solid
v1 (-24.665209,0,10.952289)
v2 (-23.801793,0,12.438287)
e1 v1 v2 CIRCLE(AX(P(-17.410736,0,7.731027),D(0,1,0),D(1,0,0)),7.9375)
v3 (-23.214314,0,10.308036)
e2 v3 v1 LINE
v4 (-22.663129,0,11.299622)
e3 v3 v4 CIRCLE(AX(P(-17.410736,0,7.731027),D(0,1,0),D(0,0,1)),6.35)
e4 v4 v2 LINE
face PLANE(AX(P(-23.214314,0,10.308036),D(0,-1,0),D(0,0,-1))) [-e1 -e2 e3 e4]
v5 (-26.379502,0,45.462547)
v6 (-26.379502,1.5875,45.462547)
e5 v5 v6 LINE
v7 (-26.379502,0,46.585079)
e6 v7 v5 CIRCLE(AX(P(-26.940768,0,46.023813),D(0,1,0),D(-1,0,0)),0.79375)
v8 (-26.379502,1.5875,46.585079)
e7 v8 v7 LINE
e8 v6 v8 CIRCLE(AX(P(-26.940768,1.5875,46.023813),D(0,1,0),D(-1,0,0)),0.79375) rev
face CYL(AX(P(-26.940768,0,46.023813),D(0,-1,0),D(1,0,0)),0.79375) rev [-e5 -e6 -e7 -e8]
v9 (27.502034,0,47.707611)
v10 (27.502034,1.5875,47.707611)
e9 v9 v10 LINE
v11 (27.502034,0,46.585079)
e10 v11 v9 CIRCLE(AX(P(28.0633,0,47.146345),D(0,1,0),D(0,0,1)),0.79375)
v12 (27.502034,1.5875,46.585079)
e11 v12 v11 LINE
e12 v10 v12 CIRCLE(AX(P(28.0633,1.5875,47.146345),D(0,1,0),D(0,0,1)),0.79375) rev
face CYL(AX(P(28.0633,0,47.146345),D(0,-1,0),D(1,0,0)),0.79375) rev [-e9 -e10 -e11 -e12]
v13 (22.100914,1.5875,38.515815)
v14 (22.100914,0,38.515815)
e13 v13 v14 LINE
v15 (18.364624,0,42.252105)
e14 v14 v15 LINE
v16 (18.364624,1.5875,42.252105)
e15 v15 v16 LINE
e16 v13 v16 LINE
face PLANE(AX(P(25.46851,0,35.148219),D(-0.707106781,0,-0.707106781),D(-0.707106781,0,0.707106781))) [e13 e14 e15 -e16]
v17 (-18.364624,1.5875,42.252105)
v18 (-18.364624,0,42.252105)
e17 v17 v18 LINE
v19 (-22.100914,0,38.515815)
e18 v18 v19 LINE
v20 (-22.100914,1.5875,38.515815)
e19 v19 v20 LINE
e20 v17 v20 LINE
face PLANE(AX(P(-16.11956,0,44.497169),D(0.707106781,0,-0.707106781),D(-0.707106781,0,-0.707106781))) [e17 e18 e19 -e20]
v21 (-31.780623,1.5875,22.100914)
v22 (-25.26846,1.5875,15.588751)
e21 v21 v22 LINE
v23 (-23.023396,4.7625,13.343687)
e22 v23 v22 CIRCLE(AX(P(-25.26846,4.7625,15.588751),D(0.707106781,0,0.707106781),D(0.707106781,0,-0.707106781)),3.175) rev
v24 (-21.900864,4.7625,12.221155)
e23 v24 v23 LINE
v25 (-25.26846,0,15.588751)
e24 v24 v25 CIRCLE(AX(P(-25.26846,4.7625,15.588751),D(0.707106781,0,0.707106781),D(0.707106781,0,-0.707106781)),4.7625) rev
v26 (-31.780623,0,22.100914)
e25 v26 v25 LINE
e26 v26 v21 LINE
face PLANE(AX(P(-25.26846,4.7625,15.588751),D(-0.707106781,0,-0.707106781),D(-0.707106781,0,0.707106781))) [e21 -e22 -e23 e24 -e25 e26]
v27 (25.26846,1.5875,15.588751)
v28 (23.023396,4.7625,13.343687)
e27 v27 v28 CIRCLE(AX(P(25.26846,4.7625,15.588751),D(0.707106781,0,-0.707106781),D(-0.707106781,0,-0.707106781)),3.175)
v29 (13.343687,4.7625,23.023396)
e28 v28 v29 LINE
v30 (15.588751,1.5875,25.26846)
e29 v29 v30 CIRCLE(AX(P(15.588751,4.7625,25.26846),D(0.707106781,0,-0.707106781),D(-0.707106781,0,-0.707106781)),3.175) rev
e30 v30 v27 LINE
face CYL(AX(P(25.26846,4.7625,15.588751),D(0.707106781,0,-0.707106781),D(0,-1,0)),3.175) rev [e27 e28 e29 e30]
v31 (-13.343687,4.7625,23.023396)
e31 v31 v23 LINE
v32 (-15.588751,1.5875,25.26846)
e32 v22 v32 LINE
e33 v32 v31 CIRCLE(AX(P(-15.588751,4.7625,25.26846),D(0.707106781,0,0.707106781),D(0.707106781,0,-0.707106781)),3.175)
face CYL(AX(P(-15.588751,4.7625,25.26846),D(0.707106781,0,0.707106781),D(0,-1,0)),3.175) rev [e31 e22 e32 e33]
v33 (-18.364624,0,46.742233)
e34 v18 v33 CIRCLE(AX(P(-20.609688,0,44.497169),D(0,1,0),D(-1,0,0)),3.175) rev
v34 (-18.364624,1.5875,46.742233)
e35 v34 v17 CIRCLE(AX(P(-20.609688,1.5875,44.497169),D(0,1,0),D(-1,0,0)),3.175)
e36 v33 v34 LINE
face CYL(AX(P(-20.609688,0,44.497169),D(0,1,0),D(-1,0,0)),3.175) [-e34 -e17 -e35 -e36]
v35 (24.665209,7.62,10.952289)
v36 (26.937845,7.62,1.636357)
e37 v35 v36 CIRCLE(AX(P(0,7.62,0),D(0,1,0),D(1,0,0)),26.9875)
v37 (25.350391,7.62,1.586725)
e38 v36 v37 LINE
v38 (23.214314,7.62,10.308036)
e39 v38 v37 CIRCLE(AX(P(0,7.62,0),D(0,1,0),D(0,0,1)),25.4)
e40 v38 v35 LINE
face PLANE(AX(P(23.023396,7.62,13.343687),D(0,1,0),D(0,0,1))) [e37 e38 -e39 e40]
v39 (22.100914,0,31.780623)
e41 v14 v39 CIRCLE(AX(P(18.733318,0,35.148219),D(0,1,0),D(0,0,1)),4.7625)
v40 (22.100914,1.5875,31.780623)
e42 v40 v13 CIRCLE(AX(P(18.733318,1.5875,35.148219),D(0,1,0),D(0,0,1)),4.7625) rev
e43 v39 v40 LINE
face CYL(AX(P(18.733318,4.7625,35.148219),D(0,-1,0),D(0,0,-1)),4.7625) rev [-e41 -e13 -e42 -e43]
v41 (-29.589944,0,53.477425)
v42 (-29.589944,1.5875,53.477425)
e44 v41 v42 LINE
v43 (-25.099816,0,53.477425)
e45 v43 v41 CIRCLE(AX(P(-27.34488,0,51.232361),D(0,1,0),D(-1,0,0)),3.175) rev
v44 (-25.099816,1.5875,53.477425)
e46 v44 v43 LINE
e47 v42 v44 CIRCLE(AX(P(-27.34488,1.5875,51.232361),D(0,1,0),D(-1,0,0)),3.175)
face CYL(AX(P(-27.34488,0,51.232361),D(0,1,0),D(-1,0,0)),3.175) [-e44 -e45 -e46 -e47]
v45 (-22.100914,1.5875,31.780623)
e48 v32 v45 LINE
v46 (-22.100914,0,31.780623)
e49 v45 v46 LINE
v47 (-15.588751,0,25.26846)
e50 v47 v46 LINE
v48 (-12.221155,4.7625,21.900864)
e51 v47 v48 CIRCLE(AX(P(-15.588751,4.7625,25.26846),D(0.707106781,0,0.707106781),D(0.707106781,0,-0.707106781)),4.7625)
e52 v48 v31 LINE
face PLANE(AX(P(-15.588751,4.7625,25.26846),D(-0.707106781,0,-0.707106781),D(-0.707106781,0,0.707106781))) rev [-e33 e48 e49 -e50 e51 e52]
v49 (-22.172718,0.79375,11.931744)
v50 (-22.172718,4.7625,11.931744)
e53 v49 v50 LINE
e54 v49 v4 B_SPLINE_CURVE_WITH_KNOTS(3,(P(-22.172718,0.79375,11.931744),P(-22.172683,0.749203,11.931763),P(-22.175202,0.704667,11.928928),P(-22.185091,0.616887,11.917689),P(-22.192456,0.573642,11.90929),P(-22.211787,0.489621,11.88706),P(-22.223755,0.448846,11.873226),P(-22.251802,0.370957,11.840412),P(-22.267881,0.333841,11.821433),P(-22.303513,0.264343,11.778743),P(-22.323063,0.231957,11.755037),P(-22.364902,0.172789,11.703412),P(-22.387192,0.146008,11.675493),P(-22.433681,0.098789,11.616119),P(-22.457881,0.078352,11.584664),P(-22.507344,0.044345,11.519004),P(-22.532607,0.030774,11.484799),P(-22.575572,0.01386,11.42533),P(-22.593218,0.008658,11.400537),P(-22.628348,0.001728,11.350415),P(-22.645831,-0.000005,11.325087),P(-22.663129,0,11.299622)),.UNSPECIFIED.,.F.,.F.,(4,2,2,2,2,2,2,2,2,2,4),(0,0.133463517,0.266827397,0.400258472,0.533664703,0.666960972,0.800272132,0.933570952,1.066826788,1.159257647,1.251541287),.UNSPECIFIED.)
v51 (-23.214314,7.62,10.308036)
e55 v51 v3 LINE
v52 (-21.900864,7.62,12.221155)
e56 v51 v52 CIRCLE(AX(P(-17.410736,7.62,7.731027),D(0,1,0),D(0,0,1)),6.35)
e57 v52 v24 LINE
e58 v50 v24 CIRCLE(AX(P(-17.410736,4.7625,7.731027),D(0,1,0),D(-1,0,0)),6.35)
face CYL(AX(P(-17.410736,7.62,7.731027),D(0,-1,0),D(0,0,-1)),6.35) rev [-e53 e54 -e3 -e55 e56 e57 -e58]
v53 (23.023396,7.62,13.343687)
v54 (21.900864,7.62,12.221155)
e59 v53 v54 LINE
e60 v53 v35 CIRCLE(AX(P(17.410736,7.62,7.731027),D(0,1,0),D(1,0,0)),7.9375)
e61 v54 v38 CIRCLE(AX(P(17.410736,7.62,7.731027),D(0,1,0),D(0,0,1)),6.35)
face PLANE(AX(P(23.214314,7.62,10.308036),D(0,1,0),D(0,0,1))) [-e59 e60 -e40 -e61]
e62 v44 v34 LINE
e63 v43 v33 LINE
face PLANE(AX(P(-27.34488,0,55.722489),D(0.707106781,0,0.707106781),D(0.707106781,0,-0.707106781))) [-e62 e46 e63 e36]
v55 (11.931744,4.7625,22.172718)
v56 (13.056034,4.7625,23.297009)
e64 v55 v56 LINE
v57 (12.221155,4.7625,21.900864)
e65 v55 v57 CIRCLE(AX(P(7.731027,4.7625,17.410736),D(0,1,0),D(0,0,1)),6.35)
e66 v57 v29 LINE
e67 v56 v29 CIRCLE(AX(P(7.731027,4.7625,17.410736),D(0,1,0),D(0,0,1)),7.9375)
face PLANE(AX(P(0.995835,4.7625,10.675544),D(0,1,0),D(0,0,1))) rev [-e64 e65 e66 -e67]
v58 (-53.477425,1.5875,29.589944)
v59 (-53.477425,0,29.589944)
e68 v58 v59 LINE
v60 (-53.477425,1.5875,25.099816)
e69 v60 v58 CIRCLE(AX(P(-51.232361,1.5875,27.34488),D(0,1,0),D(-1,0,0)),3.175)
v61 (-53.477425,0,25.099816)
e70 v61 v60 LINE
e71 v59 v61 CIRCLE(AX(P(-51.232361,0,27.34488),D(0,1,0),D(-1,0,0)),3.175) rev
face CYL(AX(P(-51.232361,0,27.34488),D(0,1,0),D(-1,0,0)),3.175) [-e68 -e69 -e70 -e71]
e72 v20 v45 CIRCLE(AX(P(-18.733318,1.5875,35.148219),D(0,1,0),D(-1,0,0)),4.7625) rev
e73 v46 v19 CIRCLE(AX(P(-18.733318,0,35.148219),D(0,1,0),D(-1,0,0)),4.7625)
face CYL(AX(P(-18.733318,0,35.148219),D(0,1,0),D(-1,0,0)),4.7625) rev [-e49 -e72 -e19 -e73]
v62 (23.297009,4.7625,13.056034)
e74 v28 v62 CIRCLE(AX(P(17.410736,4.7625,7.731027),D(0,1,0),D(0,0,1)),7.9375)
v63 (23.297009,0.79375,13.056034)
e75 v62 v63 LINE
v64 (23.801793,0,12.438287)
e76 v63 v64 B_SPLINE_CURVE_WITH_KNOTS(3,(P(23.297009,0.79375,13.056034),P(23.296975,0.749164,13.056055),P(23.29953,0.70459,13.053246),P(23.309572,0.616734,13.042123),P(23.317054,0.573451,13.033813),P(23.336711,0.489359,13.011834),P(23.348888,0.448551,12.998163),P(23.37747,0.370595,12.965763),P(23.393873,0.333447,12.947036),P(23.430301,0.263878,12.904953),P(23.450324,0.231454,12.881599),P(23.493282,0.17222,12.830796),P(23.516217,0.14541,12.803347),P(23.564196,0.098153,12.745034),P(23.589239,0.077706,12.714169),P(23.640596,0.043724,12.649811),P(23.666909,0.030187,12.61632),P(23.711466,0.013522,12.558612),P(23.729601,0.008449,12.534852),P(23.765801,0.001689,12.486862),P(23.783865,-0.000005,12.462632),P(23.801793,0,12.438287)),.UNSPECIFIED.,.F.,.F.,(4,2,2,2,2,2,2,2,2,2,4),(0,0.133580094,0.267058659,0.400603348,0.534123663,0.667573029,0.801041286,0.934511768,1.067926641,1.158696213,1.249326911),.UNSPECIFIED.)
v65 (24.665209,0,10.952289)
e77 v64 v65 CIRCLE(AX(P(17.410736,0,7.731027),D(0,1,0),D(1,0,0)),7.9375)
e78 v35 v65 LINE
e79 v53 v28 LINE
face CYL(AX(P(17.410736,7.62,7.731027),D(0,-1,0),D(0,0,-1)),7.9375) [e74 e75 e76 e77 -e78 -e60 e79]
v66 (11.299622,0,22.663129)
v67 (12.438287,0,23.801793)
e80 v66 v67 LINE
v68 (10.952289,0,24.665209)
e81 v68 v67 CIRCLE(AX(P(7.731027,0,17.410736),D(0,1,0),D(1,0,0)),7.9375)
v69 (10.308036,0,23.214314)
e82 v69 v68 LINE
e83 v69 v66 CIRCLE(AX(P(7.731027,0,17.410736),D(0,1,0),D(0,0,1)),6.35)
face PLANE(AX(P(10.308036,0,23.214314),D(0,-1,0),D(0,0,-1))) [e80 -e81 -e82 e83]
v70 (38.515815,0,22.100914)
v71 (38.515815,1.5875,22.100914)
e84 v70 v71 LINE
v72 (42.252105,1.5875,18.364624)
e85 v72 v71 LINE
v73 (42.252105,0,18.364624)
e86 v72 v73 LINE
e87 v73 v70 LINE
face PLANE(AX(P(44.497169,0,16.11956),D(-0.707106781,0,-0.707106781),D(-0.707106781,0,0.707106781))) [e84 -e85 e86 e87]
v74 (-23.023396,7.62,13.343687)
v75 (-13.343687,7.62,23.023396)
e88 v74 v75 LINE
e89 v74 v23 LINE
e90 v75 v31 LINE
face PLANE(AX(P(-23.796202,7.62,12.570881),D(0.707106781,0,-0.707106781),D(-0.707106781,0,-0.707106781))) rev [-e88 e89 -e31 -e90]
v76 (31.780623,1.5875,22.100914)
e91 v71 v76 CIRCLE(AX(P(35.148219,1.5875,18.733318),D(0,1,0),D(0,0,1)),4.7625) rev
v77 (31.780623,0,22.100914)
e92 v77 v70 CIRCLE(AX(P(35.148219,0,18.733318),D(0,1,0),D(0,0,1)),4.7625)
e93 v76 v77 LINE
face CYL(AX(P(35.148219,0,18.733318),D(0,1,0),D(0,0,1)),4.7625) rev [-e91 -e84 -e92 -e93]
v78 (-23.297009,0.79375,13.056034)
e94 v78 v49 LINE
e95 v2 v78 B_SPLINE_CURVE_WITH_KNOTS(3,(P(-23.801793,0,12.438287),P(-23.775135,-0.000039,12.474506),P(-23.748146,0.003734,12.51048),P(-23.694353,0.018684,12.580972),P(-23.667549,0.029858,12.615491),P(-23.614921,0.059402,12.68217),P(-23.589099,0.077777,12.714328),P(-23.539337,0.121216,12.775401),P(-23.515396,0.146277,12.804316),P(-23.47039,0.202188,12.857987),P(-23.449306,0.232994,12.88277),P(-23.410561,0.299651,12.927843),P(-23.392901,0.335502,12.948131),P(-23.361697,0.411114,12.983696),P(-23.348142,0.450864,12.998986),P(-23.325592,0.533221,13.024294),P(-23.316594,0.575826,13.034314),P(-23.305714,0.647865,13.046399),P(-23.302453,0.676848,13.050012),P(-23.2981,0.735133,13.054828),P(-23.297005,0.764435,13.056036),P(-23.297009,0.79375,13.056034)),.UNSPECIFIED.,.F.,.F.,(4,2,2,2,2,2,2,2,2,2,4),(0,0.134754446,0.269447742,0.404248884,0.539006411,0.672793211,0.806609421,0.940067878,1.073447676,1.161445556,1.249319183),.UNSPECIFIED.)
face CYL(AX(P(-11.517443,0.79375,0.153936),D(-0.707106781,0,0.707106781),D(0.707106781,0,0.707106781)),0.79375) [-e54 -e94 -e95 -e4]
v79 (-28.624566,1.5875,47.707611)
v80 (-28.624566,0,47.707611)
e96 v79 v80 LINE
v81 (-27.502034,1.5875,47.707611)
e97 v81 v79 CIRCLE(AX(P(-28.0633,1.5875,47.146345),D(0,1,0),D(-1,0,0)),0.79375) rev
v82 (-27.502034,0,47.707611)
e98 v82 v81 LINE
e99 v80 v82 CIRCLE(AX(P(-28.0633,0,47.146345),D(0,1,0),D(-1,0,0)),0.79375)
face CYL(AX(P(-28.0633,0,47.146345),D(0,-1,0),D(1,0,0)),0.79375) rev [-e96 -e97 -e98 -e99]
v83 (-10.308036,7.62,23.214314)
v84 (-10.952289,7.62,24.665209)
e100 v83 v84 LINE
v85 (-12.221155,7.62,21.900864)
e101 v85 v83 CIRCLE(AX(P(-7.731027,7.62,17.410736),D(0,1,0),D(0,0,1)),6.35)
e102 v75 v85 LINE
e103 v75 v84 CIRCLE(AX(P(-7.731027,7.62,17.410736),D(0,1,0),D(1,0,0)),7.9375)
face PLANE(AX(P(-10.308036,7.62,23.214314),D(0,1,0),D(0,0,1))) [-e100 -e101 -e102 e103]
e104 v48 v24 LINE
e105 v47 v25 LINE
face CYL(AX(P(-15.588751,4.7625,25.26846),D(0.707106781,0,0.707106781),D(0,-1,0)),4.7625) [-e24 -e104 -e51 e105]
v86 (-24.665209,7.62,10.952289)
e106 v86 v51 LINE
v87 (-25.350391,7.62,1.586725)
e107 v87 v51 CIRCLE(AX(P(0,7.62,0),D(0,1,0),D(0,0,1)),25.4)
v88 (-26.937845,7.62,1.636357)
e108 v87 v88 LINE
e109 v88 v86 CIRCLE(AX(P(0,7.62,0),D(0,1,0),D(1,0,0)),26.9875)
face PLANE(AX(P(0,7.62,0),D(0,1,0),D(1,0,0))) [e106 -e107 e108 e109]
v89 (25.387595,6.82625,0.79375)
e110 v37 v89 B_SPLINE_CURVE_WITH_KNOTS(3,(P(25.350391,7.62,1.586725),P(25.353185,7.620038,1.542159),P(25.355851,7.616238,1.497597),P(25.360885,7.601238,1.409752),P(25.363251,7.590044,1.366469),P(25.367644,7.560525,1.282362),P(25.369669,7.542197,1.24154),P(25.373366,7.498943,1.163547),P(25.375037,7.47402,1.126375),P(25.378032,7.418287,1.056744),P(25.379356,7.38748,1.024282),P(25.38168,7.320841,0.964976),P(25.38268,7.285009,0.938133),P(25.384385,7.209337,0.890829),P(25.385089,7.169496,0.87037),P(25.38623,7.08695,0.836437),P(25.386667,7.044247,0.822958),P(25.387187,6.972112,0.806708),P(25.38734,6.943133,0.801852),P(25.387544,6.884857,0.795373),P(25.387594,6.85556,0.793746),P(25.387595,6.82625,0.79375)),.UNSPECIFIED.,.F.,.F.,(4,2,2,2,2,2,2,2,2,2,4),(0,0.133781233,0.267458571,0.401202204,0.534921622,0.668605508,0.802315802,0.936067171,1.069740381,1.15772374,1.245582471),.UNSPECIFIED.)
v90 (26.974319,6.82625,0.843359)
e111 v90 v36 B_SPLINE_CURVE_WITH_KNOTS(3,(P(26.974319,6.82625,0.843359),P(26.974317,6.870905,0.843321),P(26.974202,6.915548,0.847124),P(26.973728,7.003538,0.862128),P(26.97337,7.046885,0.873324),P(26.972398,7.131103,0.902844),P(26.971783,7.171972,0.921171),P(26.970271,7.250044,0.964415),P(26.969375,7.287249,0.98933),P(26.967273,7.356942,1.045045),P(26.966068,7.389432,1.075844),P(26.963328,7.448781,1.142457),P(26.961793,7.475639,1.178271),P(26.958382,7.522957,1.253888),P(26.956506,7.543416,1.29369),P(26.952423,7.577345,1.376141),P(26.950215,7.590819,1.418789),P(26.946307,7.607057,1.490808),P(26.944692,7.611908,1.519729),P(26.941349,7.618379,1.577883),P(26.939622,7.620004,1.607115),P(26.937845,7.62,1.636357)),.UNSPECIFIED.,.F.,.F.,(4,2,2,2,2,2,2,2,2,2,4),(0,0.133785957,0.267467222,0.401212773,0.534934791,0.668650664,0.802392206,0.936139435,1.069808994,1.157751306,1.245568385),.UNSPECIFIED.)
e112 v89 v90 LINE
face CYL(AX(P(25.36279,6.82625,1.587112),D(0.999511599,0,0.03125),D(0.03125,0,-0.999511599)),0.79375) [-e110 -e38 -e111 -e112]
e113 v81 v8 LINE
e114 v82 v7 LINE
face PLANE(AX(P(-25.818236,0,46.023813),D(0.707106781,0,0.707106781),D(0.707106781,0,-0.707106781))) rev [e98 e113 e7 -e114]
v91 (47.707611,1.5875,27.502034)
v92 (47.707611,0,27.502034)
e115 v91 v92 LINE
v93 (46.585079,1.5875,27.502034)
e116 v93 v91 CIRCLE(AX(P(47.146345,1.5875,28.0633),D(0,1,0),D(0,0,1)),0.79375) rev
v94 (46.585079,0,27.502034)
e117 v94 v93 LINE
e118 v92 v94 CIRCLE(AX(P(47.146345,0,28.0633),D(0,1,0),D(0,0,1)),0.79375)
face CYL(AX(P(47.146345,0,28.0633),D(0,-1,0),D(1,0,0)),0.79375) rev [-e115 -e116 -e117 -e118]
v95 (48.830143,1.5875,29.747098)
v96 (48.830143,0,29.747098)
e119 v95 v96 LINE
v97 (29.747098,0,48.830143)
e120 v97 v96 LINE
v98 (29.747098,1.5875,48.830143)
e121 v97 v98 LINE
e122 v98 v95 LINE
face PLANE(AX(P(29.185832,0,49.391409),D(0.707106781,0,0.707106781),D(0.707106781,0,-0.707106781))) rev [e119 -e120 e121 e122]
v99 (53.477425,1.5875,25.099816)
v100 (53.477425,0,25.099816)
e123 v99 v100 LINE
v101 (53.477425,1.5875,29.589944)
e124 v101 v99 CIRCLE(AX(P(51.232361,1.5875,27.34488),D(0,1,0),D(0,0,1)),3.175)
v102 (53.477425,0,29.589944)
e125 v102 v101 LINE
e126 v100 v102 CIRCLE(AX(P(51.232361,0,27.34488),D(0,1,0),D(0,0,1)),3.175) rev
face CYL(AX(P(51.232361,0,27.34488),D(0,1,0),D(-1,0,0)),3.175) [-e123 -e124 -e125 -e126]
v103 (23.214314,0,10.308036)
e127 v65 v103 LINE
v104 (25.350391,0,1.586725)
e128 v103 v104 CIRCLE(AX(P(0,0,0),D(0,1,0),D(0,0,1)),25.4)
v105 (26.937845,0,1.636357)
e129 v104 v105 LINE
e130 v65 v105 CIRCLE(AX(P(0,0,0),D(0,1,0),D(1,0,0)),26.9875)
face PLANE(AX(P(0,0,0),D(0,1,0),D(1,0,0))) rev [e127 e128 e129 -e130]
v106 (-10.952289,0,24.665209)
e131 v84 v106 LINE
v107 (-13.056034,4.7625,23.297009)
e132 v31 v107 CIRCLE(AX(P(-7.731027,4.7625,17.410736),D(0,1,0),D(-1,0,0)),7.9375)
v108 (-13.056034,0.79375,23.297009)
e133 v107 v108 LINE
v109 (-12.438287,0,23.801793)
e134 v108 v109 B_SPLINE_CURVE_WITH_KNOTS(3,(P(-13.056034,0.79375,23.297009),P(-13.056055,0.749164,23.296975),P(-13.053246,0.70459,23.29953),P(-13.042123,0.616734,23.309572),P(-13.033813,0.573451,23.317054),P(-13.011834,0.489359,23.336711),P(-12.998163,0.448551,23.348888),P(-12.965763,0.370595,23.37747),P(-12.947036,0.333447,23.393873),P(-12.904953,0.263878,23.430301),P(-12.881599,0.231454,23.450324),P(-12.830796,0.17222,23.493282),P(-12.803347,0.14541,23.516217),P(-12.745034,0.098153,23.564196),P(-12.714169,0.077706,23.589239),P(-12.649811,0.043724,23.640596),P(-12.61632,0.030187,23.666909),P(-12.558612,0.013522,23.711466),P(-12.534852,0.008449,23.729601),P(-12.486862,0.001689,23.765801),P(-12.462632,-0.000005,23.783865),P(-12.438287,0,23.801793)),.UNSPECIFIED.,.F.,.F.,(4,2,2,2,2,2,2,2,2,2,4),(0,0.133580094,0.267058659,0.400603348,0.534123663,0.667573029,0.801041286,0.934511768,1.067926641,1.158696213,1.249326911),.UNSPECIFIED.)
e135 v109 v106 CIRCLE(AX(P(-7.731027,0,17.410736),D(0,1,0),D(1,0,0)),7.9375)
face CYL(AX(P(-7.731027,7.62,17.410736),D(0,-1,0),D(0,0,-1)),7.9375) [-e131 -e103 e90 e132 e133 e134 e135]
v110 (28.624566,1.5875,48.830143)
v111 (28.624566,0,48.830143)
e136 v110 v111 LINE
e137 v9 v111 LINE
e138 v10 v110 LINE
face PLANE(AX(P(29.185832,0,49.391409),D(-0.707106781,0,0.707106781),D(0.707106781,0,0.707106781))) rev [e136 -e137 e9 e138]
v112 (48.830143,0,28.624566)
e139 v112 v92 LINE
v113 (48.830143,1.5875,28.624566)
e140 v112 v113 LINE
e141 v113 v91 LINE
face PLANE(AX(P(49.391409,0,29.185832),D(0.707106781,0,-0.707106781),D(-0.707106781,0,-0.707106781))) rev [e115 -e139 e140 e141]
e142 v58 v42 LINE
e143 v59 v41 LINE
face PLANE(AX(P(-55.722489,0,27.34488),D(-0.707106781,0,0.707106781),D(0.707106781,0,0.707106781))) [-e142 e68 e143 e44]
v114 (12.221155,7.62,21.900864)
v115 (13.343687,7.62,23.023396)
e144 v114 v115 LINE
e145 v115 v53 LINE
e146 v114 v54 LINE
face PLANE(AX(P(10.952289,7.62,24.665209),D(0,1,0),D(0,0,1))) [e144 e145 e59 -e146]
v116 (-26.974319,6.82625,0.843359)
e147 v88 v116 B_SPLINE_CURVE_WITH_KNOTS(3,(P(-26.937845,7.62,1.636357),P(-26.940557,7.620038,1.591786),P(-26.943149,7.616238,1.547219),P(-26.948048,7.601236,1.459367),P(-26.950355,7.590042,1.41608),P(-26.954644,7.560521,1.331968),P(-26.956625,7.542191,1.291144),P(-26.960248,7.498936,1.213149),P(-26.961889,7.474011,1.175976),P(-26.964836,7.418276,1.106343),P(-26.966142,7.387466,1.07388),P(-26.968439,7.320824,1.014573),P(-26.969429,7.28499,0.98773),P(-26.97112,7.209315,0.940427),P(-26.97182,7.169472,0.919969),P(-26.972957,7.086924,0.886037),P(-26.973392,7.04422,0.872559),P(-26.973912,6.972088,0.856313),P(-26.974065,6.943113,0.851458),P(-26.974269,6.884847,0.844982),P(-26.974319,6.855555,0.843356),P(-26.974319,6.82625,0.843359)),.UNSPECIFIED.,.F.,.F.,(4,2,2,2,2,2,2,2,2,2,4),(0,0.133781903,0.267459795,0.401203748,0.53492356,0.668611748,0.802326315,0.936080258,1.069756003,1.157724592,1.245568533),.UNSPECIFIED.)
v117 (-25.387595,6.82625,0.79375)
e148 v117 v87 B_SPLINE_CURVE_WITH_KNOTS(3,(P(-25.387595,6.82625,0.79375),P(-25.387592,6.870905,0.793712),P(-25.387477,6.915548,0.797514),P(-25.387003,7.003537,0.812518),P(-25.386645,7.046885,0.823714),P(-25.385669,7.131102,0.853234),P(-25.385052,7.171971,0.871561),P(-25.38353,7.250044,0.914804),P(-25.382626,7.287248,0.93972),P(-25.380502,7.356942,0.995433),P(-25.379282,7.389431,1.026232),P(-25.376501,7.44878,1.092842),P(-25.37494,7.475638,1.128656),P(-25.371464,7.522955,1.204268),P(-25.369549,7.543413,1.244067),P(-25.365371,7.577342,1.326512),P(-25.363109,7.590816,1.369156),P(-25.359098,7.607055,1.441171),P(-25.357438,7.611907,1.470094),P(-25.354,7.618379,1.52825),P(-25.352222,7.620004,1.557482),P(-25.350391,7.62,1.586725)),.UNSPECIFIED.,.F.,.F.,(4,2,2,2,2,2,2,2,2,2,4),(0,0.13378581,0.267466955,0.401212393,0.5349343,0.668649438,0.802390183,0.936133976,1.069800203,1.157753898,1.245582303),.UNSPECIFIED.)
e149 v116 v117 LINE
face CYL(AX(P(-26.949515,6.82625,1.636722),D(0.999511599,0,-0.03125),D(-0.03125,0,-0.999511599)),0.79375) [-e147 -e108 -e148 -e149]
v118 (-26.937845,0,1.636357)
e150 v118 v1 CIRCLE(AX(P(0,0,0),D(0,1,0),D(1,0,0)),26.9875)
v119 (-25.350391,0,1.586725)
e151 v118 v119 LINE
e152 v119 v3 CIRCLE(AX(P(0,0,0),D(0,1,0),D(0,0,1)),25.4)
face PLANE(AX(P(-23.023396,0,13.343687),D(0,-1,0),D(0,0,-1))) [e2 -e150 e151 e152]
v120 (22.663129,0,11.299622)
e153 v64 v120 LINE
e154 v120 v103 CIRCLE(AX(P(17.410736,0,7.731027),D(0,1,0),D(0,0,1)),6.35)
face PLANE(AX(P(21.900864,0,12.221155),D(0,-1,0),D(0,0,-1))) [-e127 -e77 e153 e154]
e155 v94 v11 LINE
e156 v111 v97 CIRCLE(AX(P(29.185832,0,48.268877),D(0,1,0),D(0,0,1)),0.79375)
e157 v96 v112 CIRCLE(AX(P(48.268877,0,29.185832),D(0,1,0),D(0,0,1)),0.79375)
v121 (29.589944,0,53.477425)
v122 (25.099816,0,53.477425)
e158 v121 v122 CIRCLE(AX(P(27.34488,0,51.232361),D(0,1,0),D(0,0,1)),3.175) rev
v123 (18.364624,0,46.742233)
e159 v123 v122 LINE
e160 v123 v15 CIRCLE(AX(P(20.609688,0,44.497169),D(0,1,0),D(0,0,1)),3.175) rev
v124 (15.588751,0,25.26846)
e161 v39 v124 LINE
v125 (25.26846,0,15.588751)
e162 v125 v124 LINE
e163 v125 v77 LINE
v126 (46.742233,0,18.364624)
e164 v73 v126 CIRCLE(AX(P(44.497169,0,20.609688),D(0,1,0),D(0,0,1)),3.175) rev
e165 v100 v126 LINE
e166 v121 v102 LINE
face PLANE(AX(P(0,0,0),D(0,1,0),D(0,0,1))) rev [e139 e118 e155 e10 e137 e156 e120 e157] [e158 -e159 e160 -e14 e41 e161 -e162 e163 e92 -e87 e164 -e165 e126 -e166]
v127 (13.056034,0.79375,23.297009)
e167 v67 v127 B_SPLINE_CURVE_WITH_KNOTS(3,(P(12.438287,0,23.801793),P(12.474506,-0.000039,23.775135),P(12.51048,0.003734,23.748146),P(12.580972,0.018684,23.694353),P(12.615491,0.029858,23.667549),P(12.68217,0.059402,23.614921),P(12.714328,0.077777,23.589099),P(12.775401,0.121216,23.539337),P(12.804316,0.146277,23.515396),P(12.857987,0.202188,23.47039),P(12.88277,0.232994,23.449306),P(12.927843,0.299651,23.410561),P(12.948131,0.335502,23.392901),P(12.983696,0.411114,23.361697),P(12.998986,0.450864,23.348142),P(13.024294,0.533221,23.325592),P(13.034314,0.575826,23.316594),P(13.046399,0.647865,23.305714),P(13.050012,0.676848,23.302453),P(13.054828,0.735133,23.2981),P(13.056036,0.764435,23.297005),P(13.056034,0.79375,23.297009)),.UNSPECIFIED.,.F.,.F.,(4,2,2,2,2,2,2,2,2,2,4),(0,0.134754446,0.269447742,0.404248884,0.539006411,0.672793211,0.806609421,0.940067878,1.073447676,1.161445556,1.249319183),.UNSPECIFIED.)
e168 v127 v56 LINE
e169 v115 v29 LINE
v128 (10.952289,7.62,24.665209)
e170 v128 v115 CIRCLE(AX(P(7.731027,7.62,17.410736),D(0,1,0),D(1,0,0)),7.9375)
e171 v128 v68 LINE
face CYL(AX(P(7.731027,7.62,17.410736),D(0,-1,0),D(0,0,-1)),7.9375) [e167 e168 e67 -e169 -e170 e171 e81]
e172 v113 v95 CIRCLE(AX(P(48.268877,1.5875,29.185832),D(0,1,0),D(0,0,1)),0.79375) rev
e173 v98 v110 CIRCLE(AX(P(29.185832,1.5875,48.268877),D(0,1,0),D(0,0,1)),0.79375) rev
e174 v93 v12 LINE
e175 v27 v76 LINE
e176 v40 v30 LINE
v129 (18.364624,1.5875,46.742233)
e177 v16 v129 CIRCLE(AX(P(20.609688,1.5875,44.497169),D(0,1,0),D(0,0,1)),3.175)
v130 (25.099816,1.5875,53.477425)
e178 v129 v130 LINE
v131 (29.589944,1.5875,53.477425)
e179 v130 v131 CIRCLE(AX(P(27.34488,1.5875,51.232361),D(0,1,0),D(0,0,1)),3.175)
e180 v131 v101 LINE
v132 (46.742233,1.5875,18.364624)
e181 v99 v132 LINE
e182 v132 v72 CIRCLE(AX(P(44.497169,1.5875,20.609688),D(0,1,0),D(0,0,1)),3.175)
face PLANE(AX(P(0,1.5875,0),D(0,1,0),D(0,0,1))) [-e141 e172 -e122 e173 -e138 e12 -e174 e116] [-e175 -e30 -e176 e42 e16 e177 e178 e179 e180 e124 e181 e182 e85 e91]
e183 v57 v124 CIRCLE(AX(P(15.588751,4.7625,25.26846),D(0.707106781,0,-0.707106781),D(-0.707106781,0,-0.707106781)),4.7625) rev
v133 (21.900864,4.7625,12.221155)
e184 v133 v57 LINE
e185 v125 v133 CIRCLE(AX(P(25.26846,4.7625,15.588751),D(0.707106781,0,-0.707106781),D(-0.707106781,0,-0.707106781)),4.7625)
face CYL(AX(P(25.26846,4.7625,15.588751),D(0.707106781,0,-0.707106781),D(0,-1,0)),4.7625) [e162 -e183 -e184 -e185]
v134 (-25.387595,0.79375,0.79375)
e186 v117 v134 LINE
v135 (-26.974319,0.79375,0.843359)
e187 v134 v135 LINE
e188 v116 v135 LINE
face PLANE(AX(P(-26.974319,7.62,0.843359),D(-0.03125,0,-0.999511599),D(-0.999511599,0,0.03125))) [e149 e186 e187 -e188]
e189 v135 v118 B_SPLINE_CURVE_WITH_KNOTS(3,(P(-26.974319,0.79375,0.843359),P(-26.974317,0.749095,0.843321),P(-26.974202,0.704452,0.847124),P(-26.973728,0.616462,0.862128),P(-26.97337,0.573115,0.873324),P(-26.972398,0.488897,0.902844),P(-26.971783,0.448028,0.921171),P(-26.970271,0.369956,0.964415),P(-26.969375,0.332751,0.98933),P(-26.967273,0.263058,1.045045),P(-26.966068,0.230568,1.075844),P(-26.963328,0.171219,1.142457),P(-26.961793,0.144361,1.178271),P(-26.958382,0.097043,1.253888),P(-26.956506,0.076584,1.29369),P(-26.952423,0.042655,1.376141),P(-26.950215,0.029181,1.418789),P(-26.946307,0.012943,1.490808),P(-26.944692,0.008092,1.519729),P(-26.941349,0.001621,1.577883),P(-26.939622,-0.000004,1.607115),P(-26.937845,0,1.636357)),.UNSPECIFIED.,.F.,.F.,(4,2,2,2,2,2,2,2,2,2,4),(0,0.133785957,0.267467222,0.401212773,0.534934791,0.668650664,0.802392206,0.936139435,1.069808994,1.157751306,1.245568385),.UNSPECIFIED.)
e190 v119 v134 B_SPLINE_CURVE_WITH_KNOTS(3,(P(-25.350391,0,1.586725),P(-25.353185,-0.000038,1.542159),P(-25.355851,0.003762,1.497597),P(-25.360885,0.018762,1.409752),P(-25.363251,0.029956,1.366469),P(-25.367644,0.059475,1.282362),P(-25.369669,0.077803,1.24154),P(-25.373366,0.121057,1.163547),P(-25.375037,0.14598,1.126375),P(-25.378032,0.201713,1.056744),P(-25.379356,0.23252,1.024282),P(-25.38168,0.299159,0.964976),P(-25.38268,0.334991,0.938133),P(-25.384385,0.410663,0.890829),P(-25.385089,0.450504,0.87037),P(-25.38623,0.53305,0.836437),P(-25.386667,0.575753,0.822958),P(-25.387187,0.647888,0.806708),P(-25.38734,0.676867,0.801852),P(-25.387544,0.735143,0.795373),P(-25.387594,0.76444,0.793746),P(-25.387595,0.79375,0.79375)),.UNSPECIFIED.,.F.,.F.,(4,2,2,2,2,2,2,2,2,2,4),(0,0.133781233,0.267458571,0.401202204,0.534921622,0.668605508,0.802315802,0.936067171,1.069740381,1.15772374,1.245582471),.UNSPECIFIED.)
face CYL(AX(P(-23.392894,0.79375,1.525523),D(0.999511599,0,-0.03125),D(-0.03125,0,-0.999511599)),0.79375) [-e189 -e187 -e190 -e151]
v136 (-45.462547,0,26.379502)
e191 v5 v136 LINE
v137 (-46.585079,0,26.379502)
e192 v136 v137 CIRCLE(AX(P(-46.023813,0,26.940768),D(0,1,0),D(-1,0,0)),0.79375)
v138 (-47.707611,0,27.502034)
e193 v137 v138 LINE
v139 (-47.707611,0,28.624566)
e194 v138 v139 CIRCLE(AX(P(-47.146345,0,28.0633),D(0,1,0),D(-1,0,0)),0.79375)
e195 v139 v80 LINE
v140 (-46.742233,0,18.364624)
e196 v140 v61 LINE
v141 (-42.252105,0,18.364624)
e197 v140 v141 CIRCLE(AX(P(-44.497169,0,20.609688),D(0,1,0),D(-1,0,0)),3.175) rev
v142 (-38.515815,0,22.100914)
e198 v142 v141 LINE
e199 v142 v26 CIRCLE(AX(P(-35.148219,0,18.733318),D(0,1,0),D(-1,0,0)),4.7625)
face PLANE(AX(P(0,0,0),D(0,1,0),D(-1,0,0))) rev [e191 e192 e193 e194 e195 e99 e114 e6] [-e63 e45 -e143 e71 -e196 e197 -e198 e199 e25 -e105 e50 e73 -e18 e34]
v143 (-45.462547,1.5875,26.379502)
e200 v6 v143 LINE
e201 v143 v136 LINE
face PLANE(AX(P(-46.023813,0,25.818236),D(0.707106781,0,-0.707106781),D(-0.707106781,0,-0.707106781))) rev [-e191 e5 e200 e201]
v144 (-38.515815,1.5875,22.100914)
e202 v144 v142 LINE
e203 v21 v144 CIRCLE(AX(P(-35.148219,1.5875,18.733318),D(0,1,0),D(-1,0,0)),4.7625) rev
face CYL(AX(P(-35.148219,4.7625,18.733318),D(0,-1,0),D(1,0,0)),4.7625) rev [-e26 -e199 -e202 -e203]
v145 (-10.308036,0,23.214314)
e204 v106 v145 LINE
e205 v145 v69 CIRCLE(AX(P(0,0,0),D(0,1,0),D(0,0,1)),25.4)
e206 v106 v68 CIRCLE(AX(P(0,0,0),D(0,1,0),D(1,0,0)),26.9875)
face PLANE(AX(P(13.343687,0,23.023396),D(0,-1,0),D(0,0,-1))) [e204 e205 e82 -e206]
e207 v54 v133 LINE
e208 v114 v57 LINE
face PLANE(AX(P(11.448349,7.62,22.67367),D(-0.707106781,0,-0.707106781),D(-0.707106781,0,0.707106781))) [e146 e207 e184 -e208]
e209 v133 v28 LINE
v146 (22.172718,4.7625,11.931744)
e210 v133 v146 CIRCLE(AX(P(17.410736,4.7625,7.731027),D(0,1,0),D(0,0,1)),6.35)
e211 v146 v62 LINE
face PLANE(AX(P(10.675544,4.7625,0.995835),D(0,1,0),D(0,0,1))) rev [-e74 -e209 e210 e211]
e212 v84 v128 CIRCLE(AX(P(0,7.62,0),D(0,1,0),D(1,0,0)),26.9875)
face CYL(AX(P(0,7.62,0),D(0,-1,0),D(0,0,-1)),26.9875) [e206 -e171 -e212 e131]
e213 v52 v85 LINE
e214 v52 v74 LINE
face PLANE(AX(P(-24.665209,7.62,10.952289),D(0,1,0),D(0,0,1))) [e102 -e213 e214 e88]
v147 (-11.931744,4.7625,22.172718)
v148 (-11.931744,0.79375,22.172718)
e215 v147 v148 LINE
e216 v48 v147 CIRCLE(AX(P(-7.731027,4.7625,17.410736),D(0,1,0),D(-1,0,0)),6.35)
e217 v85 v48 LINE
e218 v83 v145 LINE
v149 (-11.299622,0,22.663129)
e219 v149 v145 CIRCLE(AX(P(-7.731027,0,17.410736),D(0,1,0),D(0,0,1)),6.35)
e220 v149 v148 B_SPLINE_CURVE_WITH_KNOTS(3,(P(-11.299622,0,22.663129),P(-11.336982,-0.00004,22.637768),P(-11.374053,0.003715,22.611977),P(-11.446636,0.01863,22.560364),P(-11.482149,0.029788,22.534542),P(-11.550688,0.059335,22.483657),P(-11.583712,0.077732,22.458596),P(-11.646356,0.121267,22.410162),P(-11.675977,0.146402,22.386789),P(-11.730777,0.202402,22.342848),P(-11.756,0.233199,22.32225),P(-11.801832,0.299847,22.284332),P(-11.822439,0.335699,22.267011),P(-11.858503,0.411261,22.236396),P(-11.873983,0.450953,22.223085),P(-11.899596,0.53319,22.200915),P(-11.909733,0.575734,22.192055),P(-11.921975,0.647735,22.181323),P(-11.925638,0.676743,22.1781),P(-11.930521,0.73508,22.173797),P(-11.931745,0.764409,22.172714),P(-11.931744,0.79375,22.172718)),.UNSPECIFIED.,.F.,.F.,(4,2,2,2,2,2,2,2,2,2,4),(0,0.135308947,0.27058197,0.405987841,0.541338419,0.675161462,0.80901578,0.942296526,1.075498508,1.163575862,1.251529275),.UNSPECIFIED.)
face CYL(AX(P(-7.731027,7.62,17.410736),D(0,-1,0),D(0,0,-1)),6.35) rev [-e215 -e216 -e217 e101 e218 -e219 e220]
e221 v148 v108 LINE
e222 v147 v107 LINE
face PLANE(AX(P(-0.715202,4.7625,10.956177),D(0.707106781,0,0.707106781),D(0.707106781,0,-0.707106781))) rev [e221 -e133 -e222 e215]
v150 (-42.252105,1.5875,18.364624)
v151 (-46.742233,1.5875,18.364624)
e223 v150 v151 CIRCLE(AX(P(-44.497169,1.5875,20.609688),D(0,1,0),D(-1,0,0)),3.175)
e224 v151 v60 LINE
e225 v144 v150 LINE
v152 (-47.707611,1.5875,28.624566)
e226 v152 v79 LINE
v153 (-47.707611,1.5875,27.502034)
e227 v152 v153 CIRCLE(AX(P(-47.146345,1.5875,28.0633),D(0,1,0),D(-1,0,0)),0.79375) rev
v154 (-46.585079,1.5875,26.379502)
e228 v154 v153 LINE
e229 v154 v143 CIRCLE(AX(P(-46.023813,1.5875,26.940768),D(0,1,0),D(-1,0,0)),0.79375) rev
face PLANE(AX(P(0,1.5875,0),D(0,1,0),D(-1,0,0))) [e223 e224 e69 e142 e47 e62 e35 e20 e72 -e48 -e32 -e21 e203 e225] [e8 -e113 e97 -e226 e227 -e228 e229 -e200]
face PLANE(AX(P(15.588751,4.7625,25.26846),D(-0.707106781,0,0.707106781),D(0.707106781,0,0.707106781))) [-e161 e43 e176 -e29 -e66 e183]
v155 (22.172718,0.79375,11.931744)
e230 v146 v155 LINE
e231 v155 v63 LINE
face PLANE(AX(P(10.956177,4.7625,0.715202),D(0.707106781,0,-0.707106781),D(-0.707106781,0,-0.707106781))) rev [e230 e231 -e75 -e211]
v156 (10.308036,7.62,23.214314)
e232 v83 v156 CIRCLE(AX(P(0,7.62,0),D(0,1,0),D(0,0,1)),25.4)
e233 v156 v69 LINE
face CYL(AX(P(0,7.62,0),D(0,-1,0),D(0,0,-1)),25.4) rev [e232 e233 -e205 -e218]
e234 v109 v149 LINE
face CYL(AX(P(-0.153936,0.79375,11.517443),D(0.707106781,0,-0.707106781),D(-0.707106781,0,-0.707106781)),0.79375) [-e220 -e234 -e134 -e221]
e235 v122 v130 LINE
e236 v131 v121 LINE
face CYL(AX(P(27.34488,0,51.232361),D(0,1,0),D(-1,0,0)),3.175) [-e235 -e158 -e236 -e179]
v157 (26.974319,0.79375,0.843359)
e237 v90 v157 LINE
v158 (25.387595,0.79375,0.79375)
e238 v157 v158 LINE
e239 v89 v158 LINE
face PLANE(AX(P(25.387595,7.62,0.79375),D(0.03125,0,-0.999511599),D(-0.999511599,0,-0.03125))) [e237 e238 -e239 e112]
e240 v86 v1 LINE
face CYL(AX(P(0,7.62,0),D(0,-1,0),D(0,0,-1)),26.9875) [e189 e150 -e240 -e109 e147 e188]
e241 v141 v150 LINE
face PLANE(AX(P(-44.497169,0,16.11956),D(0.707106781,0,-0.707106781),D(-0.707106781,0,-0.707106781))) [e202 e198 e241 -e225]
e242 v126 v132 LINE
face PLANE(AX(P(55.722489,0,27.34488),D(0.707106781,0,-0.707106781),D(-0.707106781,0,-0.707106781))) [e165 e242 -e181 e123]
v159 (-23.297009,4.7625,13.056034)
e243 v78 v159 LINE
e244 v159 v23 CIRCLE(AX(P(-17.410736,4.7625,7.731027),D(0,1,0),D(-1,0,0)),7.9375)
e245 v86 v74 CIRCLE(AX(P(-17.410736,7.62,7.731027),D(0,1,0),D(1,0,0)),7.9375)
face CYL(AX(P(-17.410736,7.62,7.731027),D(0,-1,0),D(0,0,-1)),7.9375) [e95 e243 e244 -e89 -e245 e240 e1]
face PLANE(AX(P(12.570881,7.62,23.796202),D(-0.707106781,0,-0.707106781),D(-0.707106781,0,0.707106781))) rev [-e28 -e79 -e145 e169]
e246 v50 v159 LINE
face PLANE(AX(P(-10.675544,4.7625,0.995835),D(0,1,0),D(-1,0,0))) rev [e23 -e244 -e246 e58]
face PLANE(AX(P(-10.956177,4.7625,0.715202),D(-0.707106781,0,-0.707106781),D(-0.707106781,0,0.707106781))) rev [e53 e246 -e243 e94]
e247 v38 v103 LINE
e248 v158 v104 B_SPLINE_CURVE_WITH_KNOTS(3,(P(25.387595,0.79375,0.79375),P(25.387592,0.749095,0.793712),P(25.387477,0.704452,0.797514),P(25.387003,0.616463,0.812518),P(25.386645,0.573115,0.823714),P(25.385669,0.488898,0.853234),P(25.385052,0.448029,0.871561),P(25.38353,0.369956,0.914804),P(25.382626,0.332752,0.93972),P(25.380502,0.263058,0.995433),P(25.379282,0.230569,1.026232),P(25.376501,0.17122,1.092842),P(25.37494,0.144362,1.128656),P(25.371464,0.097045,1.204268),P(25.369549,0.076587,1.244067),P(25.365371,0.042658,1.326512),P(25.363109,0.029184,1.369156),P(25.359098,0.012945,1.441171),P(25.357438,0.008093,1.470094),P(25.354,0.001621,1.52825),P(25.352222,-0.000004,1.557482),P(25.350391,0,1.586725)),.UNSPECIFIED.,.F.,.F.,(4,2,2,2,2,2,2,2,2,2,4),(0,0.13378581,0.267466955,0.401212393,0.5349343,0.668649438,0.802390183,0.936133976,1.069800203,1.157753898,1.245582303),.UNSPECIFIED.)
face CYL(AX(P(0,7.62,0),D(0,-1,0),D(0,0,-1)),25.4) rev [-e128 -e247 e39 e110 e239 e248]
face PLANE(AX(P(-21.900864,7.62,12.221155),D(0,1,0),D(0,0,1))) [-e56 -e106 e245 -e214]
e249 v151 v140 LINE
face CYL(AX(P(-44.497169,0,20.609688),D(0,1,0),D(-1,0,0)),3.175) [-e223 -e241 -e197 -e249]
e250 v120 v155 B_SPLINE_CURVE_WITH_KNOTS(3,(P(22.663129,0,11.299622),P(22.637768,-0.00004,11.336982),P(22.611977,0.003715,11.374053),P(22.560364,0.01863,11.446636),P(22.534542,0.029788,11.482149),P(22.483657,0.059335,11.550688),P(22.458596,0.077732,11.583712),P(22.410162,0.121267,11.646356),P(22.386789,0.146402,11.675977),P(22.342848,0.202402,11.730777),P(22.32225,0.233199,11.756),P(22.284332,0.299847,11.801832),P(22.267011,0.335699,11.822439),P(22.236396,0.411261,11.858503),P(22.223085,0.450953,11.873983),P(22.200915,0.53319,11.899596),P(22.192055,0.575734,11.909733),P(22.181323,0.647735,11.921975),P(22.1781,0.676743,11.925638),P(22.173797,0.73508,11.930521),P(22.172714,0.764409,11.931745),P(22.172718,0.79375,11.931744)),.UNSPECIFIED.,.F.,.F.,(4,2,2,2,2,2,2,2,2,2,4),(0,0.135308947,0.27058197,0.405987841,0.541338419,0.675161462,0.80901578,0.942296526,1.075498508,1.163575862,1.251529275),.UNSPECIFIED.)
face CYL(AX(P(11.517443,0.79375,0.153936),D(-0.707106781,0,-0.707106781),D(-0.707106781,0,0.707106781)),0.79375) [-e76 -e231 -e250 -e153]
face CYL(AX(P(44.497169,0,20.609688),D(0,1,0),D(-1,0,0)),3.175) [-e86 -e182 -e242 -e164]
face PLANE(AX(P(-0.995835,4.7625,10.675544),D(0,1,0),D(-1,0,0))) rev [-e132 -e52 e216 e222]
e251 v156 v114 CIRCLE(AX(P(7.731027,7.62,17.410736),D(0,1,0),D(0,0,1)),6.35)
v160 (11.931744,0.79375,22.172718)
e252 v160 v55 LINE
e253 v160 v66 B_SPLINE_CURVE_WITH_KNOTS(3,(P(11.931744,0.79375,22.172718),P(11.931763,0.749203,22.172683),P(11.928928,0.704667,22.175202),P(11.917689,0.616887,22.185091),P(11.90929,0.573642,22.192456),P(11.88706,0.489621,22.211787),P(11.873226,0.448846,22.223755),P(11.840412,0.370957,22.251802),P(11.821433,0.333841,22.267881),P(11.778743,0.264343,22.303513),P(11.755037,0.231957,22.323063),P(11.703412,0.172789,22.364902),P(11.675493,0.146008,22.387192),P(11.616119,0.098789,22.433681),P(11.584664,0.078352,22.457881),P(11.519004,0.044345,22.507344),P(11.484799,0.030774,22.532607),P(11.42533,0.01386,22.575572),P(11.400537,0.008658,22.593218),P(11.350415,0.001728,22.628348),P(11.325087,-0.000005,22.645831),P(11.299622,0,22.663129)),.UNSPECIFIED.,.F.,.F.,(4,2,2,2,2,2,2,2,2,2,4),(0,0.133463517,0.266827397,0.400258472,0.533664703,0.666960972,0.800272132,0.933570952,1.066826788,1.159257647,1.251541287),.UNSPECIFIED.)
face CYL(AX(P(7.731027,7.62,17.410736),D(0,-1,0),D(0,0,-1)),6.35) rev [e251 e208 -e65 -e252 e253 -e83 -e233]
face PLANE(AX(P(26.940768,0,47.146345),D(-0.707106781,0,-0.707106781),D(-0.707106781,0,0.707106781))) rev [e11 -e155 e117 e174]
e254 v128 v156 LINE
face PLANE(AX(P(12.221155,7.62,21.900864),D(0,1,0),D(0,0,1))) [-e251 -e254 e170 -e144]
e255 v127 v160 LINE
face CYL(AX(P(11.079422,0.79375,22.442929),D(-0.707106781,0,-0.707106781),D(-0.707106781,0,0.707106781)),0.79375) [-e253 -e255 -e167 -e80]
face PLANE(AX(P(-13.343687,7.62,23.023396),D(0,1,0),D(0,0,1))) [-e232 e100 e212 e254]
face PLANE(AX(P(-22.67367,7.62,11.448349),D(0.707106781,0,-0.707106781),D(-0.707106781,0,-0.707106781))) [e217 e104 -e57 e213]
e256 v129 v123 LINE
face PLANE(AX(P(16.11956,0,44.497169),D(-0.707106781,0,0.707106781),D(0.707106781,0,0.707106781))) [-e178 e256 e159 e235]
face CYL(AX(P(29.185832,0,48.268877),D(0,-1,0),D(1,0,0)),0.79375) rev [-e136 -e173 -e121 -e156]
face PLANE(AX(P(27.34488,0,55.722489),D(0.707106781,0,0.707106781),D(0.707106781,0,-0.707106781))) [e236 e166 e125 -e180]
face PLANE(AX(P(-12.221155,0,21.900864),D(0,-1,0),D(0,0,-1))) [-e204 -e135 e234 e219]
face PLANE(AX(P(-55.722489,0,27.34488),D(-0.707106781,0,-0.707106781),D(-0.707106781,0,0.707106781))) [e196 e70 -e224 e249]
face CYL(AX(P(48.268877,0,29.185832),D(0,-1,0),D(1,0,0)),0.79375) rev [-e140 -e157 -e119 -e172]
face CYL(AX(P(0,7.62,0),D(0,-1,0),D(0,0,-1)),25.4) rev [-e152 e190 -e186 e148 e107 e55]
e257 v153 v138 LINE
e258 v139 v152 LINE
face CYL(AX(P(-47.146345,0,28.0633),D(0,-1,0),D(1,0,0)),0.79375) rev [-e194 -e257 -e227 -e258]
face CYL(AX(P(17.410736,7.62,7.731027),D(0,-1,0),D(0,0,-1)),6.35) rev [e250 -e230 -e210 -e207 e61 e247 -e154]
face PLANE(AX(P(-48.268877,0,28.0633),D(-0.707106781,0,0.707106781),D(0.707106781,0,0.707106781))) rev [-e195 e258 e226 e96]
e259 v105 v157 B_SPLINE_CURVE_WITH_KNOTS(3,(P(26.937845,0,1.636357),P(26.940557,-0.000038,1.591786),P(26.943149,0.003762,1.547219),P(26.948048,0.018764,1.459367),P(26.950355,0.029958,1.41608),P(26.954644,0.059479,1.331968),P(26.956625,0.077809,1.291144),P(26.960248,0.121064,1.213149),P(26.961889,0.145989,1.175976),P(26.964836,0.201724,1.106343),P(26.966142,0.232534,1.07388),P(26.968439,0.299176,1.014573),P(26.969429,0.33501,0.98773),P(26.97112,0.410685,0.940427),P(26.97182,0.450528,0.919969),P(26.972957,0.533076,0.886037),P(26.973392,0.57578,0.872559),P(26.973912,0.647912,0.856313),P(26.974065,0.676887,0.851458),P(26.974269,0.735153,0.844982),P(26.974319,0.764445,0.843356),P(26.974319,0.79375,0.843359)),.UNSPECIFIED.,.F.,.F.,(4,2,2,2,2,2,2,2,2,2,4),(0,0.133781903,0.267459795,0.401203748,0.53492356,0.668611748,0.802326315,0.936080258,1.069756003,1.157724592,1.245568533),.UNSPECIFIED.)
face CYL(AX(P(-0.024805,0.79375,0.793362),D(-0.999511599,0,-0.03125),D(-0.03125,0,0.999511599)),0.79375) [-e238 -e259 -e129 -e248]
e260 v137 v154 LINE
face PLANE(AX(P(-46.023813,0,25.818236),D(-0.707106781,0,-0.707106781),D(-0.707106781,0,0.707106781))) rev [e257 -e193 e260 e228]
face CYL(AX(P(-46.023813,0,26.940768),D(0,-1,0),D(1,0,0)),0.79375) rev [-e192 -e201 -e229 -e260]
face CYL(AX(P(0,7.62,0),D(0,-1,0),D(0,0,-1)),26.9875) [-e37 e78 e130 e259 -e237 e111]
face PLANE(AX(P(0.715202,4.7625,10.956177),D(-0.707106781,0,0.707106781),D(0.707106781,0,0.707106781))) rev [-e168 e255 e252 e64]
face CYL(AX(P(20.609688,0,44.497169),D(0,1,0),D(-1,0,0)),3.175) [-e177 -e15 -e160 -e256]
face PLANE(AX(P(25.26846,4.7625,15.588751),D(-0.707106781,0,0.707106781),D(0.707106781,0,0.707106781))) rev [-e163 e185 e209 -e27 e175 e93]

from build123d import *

# Parameters (mm, degrees)
BASE_FLANGE1_DEPTH             = 7.62
EDGE_FLANGE1_STRIP_W           = 12.7
EDGE_FLANGE1_STRIP_H           = 1.5875
EDGE_FLANGE1_STRIP_CUT_DEPTH   = 13.689174868
EDGE_FLANGE1_STRIP_2_W         = 12.7
EDGE_FLANGE1_STRIP_2_H         = 1.5875
EDGE_FLANGE1_STRIP_CUT_2_DEPTH = 13.689174868
EDGE_FLANGE1_DEPTH             = 13.689174868
EDGE_FLANGE1_BEND_DEPTH        = 13.689174868
SKETCH12_W                     = 0.396875
SKETCH12_H                     = 4.784490506
SKETCH12_H_2                   = 4.782978668
CUT_EXTRUDE3_DEPTH             = 25.4
SKETCH13_W                     = 0.396875
SKETCH13_H                     = 4.7625
CUT_EXTRUDE4_DEPTH             = 25.4
FILLET2_R                      = 0.79375
BOSS_EXTRUDE1_DEPTH            = 1.5875
FILLET3_R                      = 3.175
FILLET4_R                      = 4.7625
FILLET5_R                      = 0.79375


# Read off the part's stored shape, not the designer's step: Base-Flange1
# Sheet-metal steps are written as plain solids
with BuildPart() as part:
    # Base-Flange1 outline → Base-Flange1 (new body)
    with BuildSketch(Plane(origin=(0, 0, 0), x_dir=(1, 0, 0), z_dir=(0, 1, 0))):
        with BuildLine():
            ThreePointArc((24.665208878, -10.952288676), (26.30984284, -6.00976921), (26.974319291, -0.843359375))
            Line((26.974319291, -0.843359375), (25.387594627, -0.79375))
            ThreePointArc((25.387594627, -0.79375), (24.762205026, -5.656253374), (23.214314238, -10.308036401))
            ThreePointArc((23.214314238, -10.308036401), (22.645724221, -11.325105064), (21.900863739, -12.221155361))
            Line((21.900863739, -12.221155361), (12.221155361, -21.900863739))
            ThreePointArc((12.221155361, -21.900863739), (11.325105064, -22.645724221), (10.308036401, -23.214314238))
            ThreePointArc((10.308036401, -23.214314238), (0, -25.4), (-10.308036401, -23.214314238))
            ThreePointArc((-10.308036401, -23.214314238), (-11.325105064, -22.645724221), (-12.221155361, -21.900863739))
            Line((-12.221155361, -21.900863739), (-21.900863739, -12.221155361))
            ThreePointArc((-21.900863739, -12.221155361), (-22.645724221, -11.325105064), (-23.214314238, -10.308036401))
            ThreePointArc((-23.214314238, -10.308036401), (-24.762205026, -5.656253374), (-25.387594627, -0.79375))
            Line((-25.387594627, -0.79375), (-26.974319291, -0.843359375))
            ThreePointArc((-26.974319291, -0.843359375), (-26.30984284, -6.00976921), (-24.665208878, -10.952288676))
            ThreePointArc((-24.665208878, -10.952288676), (-23.954471356, -12.223624504), (-23.023395754, -13.343687376))
            Line((-23.023395754, -13.343687376), (-13.343687376, -23.023395754))
            ThreePointArc((-13.343687376, -23.023395754), (-12.223624504, -23.954471356), (-10.952288676, -24.665208878))
            ThreePointArc((-10.952288676, -24.665208878), (0, -26.9875), (10.952288676, -24.665208878))
            ThreePointArc((10.952288676, -24.665208878), (12.223624504, -23.954471356), (13.343687376, -23.023395754))
            Line((13.343687376, -23.023395754), (23.023395754, -13.343687376))
            ThreePointArc((23.023395754, -13.343687376), (23.954471356, -12.223624504), (24.665208878, -10.952288676))
        make_face()
    extrude(amount=BASE_FLANGE1_DEPTH)

    # Edge-Flange1 strip (across the edge) → Edge-Flange1 strip cut (cut)
    with BuildSketch(Plane(origin=(-23.023395754, 0, 13.343687376), x_dir=(0, 1, 0), z_dir=(0.7071067811865437, 0, 0.7071067811865515))):
        with Locations((-1.5875, -0.79375)):
            Rectangle(EDGE_FLANGE1_STRIP_W, EDGE_FLANGE1_STRIP_H)
    extrude(amount=EDGE_FLANGE1_STRIP_CUT_DEPTH, mode=Mode.SUBTRACT)

    # Edge-Flange1 strip 2 (across the edge) → Edge-Flange1 strip cut 2 (cut)
    with BuildSketch(Plane(origin=(13.343687376, 0, 23.023395754), x_dir=(0, 1, 0), z_dir=(0.7071067811865512, 0, -0.7071067811865438))):
        with Locations((-1.5875, -0.79375)):
            Rectangle(EDGE_FLANGE1_STRIP_2_W, EDGE_FLANGE1_STRIP_2_H)
    extrude(amount=EDGE_FLANGE1_STRIP_CUT_2_DEPTH, mode=Mode.SUBTRACT)

    # Edge-Flange1 section (across the edge) → Edge-Flange1 (add)
    with BuildSketch(Plane(origin=(-23.023395754, 0, 13.343687376), x_dir=(0, 1, 0), z_dir=(0.7071067811865437, 0, 0.7071067811865515))):
        with BuildLine():
            Line((0, 3.175), (0, 7.9375))
            Line((0, 7.9375), (1.5875, 7.9375))
            Line((1.5875, 7.9375), (1.5875, 3.175))
            ThreePointArc((1.5875, 3.175), (2.51743597, 0.92993597), (4.7625, 0))
            Line((4.7625, 0), (4.7625, -1.5875))
            ThreePointArc((4.7625, -1.5875), (1.394903955, -0.192596045), (0, 3.175))
        make_face()
    extrude(amount=EDGE_FLANGE1_DEPTH)

    # Edge-Flange1 section 2 (across the edge) → Edge-Flange1 bend (add)
    with BuildSketch(Plane(origin=(13.343687376, 0, 23.023395754), x_dir=(0, 1, 0), z_dir=(0.7071067811865512, 0, -0.7071067811865438))):
        with BuildLine():
            Line((0, 3.175), (0, 7.9375))
            Line((0, 7.9375), (1.5875, 7.9375))
            Line((1.5875, 7.9375), (1.5875, 3.175))
            ThreePointArc((1.5875, 3.175), (2.51743597, 0.92993597), (4.7625, 0))
            Line((4.7625, 0), (4.7625, -1.5875))
            ThreePointArc((4.7625, -1.5875), (1.394903955, -0.192596045), (0, 3.175))
        make_face()
    extrude(amount=EDGE_FLANGE1_BEND_DEPTH)

    # Sketch12 → Cut-Extrude3 (cut)
    with BuildSketch(Plane(origin=(-23.796201641, 0, 23.796201641), x_dir=(0.7071067811865438, 3.532708032038459e-15, 0.7071067811865512), z_dir=(-0.7071067811865512, -3.532708032038497e-15, 0.7071067811865438))):
        with Locations((7.043024934, 2.370254747)):
            Rectangle(SKETCH12_W, SKETCH12_H)
        with Locations((-7.043024934, 2.371010666)):
            Rectangle(SKETCH12_W, SKETCH12_H_2)
    extrude(amount=-CUT_EXTRUDE3_DEPTH, mode=Mode.SUBTRACT)

    # Sketch13 → Cut-Extrude4 (cut)
    with BuildSketch(Plane(origin=(23.796201641, 0, 23.796201641), x_dir=(0.7071067811865513, 3.414951097637176e-15, -0.7071067811865437), z_dir=(0.7071067811865437, -3.414951097637212e-15, 0.7071067811865513))):
        with Locations((7.043024934, 2.38125)):
            Rectangle(SKETCH13_W, SKETCH13_H)
        with Locations((-7.043024934, 2.38125)):
            Rectangle(SKETCH13_W, SKETCH13_H)
    extrude(amount=-CUT_EXTRUDE4_DEPTH, mode=Mode.SUBTRACT)

    # Fillet2
    fillet2_edges = [part.edges().sort_by_distance(p)[0] for p in [
        (-12.493889076, 0, 22.734863462),
        (-22.734863462, 0, 12.493889076),
        (-26.180956959, 0, 0.818554688),
        (22.734863462, 0, 12.493889076),
        (26.180956959, 0, 0.818554688),
        (12.493889076, 0, 22.734863462),
        (-26.180956959, 7.62, 0.818554688),
        (26.180956959, 7.62, 0.818554688),
    ]]
    fillet(fillet2_edges, radius=FILLET2_R)

    # Sketch4 → Boss-Extrude1 (add)
    # profile 1 of 2: a face of its own
    with BuildSketch(Plane(origin=(0, 1.5875, 0), x_dir=(1, 0, 0), z_dir=(0, 1, 0))):
        Polygon((-18.956347452, -28.63605583), (-25.46851022, -35.148218598), (-16.119559737, -44.49716908), (-27.344879889, -55.722489231), (-55.722489231, -27.344879889), (-44.49716908, -16.119559737), (-35.148218598, -25.46851022), (-28.63605583, -18.956347452), align=None)
        Polygon((-48.268876651, -28.063300378), (-28.063300378, -48.268876651), (-25.818236348, -46.02381262), (-46.02381262, -25.818236348), align=None, mode=Mode.SUBTRACT)
    # profile 2 of 2: a face of its own
    with BuildSketch(Plane(origin=(0, 1.5875, 0), x_dir=(1, 0, 0), z_dir=(0, 1, 0))):
        Polygon((18.956347452, -28.63605583), (25.46851022, -35.148218598), (16.119559737, -44.49716908), (27.344879889, -55.722489231), (55.722489231, -27.344879889), (44.49716908, -16.119559737), (35.148218598, -25.46851022), (28.63605583, -18.956347452), align=None)
        Polygon((29.185832393, -49.391408666), (26.940768363, -47.146344636), (47.146344636, -26.940768363), (49.391408666, -29.185832393), align=None, mode=Mode.SUBTRACT)
    extrude(amount=-BOSS_EXTRUDE1_DEPTH)

    # Fillet3
    fillet3_edges = [part.edges().sort_by_distance(p)[0] for p in [
        (-16.119559737, 0.79375, 44.49716908),
        (-27.344879889, 0.79375, 55.722489231),
        (-55.722489231, 0.79375, 27.344879889),
        (-44.49716908, 0.79375, 16.119559737),
        (44.49716908, 0.79375, 16.119559737),
        (55.722489231, 0.79375, 27.344879889),
        (27.344879889, 0.79375, 55.722489231),
        (16.119559737, 0.79375, 44.49716908),
    ]]
    fillet(fillet3_edges, radius=FILLET3_R)

    # Fillet4
    fillet4_edges = [part.edges().sort_by_distance(p)[0] for p in [
        (-25.46851022, 0.79375, 35.148218598),
        (-35.148218598, 0.79375, 25.46851022),
        (35.148218598, 0.79375, 25.46851022),
        (25.46851022, 0.79375, 35.148218598),
    ]]
    fillet(fillet4_edges, radius=FILLET4_R)

    # Fillet5
    fillet5_edges = [part.edges().sort_by_distance(p)[0] for p in [
        (-46.02381262, 0.79375, 25.818236348),
        (-25.818236348, 0.79375, 46.02381262),
        (-28.063300378, 0.79375, 48.268876651),
        (-48.268876651, 0.79375, 28.063300378),
        (29.185832393, 0.79375, 49.391408666),
        (26.940768363, 0.79375, 47.146344636),
        (47.146344636, 0.79375, 26.940768363),
        (49.391408666, 0.79375, 29.185832393),
    ]]
    fillet(fillet5_edges, radius=FILLET5_R)


solid = part.part
